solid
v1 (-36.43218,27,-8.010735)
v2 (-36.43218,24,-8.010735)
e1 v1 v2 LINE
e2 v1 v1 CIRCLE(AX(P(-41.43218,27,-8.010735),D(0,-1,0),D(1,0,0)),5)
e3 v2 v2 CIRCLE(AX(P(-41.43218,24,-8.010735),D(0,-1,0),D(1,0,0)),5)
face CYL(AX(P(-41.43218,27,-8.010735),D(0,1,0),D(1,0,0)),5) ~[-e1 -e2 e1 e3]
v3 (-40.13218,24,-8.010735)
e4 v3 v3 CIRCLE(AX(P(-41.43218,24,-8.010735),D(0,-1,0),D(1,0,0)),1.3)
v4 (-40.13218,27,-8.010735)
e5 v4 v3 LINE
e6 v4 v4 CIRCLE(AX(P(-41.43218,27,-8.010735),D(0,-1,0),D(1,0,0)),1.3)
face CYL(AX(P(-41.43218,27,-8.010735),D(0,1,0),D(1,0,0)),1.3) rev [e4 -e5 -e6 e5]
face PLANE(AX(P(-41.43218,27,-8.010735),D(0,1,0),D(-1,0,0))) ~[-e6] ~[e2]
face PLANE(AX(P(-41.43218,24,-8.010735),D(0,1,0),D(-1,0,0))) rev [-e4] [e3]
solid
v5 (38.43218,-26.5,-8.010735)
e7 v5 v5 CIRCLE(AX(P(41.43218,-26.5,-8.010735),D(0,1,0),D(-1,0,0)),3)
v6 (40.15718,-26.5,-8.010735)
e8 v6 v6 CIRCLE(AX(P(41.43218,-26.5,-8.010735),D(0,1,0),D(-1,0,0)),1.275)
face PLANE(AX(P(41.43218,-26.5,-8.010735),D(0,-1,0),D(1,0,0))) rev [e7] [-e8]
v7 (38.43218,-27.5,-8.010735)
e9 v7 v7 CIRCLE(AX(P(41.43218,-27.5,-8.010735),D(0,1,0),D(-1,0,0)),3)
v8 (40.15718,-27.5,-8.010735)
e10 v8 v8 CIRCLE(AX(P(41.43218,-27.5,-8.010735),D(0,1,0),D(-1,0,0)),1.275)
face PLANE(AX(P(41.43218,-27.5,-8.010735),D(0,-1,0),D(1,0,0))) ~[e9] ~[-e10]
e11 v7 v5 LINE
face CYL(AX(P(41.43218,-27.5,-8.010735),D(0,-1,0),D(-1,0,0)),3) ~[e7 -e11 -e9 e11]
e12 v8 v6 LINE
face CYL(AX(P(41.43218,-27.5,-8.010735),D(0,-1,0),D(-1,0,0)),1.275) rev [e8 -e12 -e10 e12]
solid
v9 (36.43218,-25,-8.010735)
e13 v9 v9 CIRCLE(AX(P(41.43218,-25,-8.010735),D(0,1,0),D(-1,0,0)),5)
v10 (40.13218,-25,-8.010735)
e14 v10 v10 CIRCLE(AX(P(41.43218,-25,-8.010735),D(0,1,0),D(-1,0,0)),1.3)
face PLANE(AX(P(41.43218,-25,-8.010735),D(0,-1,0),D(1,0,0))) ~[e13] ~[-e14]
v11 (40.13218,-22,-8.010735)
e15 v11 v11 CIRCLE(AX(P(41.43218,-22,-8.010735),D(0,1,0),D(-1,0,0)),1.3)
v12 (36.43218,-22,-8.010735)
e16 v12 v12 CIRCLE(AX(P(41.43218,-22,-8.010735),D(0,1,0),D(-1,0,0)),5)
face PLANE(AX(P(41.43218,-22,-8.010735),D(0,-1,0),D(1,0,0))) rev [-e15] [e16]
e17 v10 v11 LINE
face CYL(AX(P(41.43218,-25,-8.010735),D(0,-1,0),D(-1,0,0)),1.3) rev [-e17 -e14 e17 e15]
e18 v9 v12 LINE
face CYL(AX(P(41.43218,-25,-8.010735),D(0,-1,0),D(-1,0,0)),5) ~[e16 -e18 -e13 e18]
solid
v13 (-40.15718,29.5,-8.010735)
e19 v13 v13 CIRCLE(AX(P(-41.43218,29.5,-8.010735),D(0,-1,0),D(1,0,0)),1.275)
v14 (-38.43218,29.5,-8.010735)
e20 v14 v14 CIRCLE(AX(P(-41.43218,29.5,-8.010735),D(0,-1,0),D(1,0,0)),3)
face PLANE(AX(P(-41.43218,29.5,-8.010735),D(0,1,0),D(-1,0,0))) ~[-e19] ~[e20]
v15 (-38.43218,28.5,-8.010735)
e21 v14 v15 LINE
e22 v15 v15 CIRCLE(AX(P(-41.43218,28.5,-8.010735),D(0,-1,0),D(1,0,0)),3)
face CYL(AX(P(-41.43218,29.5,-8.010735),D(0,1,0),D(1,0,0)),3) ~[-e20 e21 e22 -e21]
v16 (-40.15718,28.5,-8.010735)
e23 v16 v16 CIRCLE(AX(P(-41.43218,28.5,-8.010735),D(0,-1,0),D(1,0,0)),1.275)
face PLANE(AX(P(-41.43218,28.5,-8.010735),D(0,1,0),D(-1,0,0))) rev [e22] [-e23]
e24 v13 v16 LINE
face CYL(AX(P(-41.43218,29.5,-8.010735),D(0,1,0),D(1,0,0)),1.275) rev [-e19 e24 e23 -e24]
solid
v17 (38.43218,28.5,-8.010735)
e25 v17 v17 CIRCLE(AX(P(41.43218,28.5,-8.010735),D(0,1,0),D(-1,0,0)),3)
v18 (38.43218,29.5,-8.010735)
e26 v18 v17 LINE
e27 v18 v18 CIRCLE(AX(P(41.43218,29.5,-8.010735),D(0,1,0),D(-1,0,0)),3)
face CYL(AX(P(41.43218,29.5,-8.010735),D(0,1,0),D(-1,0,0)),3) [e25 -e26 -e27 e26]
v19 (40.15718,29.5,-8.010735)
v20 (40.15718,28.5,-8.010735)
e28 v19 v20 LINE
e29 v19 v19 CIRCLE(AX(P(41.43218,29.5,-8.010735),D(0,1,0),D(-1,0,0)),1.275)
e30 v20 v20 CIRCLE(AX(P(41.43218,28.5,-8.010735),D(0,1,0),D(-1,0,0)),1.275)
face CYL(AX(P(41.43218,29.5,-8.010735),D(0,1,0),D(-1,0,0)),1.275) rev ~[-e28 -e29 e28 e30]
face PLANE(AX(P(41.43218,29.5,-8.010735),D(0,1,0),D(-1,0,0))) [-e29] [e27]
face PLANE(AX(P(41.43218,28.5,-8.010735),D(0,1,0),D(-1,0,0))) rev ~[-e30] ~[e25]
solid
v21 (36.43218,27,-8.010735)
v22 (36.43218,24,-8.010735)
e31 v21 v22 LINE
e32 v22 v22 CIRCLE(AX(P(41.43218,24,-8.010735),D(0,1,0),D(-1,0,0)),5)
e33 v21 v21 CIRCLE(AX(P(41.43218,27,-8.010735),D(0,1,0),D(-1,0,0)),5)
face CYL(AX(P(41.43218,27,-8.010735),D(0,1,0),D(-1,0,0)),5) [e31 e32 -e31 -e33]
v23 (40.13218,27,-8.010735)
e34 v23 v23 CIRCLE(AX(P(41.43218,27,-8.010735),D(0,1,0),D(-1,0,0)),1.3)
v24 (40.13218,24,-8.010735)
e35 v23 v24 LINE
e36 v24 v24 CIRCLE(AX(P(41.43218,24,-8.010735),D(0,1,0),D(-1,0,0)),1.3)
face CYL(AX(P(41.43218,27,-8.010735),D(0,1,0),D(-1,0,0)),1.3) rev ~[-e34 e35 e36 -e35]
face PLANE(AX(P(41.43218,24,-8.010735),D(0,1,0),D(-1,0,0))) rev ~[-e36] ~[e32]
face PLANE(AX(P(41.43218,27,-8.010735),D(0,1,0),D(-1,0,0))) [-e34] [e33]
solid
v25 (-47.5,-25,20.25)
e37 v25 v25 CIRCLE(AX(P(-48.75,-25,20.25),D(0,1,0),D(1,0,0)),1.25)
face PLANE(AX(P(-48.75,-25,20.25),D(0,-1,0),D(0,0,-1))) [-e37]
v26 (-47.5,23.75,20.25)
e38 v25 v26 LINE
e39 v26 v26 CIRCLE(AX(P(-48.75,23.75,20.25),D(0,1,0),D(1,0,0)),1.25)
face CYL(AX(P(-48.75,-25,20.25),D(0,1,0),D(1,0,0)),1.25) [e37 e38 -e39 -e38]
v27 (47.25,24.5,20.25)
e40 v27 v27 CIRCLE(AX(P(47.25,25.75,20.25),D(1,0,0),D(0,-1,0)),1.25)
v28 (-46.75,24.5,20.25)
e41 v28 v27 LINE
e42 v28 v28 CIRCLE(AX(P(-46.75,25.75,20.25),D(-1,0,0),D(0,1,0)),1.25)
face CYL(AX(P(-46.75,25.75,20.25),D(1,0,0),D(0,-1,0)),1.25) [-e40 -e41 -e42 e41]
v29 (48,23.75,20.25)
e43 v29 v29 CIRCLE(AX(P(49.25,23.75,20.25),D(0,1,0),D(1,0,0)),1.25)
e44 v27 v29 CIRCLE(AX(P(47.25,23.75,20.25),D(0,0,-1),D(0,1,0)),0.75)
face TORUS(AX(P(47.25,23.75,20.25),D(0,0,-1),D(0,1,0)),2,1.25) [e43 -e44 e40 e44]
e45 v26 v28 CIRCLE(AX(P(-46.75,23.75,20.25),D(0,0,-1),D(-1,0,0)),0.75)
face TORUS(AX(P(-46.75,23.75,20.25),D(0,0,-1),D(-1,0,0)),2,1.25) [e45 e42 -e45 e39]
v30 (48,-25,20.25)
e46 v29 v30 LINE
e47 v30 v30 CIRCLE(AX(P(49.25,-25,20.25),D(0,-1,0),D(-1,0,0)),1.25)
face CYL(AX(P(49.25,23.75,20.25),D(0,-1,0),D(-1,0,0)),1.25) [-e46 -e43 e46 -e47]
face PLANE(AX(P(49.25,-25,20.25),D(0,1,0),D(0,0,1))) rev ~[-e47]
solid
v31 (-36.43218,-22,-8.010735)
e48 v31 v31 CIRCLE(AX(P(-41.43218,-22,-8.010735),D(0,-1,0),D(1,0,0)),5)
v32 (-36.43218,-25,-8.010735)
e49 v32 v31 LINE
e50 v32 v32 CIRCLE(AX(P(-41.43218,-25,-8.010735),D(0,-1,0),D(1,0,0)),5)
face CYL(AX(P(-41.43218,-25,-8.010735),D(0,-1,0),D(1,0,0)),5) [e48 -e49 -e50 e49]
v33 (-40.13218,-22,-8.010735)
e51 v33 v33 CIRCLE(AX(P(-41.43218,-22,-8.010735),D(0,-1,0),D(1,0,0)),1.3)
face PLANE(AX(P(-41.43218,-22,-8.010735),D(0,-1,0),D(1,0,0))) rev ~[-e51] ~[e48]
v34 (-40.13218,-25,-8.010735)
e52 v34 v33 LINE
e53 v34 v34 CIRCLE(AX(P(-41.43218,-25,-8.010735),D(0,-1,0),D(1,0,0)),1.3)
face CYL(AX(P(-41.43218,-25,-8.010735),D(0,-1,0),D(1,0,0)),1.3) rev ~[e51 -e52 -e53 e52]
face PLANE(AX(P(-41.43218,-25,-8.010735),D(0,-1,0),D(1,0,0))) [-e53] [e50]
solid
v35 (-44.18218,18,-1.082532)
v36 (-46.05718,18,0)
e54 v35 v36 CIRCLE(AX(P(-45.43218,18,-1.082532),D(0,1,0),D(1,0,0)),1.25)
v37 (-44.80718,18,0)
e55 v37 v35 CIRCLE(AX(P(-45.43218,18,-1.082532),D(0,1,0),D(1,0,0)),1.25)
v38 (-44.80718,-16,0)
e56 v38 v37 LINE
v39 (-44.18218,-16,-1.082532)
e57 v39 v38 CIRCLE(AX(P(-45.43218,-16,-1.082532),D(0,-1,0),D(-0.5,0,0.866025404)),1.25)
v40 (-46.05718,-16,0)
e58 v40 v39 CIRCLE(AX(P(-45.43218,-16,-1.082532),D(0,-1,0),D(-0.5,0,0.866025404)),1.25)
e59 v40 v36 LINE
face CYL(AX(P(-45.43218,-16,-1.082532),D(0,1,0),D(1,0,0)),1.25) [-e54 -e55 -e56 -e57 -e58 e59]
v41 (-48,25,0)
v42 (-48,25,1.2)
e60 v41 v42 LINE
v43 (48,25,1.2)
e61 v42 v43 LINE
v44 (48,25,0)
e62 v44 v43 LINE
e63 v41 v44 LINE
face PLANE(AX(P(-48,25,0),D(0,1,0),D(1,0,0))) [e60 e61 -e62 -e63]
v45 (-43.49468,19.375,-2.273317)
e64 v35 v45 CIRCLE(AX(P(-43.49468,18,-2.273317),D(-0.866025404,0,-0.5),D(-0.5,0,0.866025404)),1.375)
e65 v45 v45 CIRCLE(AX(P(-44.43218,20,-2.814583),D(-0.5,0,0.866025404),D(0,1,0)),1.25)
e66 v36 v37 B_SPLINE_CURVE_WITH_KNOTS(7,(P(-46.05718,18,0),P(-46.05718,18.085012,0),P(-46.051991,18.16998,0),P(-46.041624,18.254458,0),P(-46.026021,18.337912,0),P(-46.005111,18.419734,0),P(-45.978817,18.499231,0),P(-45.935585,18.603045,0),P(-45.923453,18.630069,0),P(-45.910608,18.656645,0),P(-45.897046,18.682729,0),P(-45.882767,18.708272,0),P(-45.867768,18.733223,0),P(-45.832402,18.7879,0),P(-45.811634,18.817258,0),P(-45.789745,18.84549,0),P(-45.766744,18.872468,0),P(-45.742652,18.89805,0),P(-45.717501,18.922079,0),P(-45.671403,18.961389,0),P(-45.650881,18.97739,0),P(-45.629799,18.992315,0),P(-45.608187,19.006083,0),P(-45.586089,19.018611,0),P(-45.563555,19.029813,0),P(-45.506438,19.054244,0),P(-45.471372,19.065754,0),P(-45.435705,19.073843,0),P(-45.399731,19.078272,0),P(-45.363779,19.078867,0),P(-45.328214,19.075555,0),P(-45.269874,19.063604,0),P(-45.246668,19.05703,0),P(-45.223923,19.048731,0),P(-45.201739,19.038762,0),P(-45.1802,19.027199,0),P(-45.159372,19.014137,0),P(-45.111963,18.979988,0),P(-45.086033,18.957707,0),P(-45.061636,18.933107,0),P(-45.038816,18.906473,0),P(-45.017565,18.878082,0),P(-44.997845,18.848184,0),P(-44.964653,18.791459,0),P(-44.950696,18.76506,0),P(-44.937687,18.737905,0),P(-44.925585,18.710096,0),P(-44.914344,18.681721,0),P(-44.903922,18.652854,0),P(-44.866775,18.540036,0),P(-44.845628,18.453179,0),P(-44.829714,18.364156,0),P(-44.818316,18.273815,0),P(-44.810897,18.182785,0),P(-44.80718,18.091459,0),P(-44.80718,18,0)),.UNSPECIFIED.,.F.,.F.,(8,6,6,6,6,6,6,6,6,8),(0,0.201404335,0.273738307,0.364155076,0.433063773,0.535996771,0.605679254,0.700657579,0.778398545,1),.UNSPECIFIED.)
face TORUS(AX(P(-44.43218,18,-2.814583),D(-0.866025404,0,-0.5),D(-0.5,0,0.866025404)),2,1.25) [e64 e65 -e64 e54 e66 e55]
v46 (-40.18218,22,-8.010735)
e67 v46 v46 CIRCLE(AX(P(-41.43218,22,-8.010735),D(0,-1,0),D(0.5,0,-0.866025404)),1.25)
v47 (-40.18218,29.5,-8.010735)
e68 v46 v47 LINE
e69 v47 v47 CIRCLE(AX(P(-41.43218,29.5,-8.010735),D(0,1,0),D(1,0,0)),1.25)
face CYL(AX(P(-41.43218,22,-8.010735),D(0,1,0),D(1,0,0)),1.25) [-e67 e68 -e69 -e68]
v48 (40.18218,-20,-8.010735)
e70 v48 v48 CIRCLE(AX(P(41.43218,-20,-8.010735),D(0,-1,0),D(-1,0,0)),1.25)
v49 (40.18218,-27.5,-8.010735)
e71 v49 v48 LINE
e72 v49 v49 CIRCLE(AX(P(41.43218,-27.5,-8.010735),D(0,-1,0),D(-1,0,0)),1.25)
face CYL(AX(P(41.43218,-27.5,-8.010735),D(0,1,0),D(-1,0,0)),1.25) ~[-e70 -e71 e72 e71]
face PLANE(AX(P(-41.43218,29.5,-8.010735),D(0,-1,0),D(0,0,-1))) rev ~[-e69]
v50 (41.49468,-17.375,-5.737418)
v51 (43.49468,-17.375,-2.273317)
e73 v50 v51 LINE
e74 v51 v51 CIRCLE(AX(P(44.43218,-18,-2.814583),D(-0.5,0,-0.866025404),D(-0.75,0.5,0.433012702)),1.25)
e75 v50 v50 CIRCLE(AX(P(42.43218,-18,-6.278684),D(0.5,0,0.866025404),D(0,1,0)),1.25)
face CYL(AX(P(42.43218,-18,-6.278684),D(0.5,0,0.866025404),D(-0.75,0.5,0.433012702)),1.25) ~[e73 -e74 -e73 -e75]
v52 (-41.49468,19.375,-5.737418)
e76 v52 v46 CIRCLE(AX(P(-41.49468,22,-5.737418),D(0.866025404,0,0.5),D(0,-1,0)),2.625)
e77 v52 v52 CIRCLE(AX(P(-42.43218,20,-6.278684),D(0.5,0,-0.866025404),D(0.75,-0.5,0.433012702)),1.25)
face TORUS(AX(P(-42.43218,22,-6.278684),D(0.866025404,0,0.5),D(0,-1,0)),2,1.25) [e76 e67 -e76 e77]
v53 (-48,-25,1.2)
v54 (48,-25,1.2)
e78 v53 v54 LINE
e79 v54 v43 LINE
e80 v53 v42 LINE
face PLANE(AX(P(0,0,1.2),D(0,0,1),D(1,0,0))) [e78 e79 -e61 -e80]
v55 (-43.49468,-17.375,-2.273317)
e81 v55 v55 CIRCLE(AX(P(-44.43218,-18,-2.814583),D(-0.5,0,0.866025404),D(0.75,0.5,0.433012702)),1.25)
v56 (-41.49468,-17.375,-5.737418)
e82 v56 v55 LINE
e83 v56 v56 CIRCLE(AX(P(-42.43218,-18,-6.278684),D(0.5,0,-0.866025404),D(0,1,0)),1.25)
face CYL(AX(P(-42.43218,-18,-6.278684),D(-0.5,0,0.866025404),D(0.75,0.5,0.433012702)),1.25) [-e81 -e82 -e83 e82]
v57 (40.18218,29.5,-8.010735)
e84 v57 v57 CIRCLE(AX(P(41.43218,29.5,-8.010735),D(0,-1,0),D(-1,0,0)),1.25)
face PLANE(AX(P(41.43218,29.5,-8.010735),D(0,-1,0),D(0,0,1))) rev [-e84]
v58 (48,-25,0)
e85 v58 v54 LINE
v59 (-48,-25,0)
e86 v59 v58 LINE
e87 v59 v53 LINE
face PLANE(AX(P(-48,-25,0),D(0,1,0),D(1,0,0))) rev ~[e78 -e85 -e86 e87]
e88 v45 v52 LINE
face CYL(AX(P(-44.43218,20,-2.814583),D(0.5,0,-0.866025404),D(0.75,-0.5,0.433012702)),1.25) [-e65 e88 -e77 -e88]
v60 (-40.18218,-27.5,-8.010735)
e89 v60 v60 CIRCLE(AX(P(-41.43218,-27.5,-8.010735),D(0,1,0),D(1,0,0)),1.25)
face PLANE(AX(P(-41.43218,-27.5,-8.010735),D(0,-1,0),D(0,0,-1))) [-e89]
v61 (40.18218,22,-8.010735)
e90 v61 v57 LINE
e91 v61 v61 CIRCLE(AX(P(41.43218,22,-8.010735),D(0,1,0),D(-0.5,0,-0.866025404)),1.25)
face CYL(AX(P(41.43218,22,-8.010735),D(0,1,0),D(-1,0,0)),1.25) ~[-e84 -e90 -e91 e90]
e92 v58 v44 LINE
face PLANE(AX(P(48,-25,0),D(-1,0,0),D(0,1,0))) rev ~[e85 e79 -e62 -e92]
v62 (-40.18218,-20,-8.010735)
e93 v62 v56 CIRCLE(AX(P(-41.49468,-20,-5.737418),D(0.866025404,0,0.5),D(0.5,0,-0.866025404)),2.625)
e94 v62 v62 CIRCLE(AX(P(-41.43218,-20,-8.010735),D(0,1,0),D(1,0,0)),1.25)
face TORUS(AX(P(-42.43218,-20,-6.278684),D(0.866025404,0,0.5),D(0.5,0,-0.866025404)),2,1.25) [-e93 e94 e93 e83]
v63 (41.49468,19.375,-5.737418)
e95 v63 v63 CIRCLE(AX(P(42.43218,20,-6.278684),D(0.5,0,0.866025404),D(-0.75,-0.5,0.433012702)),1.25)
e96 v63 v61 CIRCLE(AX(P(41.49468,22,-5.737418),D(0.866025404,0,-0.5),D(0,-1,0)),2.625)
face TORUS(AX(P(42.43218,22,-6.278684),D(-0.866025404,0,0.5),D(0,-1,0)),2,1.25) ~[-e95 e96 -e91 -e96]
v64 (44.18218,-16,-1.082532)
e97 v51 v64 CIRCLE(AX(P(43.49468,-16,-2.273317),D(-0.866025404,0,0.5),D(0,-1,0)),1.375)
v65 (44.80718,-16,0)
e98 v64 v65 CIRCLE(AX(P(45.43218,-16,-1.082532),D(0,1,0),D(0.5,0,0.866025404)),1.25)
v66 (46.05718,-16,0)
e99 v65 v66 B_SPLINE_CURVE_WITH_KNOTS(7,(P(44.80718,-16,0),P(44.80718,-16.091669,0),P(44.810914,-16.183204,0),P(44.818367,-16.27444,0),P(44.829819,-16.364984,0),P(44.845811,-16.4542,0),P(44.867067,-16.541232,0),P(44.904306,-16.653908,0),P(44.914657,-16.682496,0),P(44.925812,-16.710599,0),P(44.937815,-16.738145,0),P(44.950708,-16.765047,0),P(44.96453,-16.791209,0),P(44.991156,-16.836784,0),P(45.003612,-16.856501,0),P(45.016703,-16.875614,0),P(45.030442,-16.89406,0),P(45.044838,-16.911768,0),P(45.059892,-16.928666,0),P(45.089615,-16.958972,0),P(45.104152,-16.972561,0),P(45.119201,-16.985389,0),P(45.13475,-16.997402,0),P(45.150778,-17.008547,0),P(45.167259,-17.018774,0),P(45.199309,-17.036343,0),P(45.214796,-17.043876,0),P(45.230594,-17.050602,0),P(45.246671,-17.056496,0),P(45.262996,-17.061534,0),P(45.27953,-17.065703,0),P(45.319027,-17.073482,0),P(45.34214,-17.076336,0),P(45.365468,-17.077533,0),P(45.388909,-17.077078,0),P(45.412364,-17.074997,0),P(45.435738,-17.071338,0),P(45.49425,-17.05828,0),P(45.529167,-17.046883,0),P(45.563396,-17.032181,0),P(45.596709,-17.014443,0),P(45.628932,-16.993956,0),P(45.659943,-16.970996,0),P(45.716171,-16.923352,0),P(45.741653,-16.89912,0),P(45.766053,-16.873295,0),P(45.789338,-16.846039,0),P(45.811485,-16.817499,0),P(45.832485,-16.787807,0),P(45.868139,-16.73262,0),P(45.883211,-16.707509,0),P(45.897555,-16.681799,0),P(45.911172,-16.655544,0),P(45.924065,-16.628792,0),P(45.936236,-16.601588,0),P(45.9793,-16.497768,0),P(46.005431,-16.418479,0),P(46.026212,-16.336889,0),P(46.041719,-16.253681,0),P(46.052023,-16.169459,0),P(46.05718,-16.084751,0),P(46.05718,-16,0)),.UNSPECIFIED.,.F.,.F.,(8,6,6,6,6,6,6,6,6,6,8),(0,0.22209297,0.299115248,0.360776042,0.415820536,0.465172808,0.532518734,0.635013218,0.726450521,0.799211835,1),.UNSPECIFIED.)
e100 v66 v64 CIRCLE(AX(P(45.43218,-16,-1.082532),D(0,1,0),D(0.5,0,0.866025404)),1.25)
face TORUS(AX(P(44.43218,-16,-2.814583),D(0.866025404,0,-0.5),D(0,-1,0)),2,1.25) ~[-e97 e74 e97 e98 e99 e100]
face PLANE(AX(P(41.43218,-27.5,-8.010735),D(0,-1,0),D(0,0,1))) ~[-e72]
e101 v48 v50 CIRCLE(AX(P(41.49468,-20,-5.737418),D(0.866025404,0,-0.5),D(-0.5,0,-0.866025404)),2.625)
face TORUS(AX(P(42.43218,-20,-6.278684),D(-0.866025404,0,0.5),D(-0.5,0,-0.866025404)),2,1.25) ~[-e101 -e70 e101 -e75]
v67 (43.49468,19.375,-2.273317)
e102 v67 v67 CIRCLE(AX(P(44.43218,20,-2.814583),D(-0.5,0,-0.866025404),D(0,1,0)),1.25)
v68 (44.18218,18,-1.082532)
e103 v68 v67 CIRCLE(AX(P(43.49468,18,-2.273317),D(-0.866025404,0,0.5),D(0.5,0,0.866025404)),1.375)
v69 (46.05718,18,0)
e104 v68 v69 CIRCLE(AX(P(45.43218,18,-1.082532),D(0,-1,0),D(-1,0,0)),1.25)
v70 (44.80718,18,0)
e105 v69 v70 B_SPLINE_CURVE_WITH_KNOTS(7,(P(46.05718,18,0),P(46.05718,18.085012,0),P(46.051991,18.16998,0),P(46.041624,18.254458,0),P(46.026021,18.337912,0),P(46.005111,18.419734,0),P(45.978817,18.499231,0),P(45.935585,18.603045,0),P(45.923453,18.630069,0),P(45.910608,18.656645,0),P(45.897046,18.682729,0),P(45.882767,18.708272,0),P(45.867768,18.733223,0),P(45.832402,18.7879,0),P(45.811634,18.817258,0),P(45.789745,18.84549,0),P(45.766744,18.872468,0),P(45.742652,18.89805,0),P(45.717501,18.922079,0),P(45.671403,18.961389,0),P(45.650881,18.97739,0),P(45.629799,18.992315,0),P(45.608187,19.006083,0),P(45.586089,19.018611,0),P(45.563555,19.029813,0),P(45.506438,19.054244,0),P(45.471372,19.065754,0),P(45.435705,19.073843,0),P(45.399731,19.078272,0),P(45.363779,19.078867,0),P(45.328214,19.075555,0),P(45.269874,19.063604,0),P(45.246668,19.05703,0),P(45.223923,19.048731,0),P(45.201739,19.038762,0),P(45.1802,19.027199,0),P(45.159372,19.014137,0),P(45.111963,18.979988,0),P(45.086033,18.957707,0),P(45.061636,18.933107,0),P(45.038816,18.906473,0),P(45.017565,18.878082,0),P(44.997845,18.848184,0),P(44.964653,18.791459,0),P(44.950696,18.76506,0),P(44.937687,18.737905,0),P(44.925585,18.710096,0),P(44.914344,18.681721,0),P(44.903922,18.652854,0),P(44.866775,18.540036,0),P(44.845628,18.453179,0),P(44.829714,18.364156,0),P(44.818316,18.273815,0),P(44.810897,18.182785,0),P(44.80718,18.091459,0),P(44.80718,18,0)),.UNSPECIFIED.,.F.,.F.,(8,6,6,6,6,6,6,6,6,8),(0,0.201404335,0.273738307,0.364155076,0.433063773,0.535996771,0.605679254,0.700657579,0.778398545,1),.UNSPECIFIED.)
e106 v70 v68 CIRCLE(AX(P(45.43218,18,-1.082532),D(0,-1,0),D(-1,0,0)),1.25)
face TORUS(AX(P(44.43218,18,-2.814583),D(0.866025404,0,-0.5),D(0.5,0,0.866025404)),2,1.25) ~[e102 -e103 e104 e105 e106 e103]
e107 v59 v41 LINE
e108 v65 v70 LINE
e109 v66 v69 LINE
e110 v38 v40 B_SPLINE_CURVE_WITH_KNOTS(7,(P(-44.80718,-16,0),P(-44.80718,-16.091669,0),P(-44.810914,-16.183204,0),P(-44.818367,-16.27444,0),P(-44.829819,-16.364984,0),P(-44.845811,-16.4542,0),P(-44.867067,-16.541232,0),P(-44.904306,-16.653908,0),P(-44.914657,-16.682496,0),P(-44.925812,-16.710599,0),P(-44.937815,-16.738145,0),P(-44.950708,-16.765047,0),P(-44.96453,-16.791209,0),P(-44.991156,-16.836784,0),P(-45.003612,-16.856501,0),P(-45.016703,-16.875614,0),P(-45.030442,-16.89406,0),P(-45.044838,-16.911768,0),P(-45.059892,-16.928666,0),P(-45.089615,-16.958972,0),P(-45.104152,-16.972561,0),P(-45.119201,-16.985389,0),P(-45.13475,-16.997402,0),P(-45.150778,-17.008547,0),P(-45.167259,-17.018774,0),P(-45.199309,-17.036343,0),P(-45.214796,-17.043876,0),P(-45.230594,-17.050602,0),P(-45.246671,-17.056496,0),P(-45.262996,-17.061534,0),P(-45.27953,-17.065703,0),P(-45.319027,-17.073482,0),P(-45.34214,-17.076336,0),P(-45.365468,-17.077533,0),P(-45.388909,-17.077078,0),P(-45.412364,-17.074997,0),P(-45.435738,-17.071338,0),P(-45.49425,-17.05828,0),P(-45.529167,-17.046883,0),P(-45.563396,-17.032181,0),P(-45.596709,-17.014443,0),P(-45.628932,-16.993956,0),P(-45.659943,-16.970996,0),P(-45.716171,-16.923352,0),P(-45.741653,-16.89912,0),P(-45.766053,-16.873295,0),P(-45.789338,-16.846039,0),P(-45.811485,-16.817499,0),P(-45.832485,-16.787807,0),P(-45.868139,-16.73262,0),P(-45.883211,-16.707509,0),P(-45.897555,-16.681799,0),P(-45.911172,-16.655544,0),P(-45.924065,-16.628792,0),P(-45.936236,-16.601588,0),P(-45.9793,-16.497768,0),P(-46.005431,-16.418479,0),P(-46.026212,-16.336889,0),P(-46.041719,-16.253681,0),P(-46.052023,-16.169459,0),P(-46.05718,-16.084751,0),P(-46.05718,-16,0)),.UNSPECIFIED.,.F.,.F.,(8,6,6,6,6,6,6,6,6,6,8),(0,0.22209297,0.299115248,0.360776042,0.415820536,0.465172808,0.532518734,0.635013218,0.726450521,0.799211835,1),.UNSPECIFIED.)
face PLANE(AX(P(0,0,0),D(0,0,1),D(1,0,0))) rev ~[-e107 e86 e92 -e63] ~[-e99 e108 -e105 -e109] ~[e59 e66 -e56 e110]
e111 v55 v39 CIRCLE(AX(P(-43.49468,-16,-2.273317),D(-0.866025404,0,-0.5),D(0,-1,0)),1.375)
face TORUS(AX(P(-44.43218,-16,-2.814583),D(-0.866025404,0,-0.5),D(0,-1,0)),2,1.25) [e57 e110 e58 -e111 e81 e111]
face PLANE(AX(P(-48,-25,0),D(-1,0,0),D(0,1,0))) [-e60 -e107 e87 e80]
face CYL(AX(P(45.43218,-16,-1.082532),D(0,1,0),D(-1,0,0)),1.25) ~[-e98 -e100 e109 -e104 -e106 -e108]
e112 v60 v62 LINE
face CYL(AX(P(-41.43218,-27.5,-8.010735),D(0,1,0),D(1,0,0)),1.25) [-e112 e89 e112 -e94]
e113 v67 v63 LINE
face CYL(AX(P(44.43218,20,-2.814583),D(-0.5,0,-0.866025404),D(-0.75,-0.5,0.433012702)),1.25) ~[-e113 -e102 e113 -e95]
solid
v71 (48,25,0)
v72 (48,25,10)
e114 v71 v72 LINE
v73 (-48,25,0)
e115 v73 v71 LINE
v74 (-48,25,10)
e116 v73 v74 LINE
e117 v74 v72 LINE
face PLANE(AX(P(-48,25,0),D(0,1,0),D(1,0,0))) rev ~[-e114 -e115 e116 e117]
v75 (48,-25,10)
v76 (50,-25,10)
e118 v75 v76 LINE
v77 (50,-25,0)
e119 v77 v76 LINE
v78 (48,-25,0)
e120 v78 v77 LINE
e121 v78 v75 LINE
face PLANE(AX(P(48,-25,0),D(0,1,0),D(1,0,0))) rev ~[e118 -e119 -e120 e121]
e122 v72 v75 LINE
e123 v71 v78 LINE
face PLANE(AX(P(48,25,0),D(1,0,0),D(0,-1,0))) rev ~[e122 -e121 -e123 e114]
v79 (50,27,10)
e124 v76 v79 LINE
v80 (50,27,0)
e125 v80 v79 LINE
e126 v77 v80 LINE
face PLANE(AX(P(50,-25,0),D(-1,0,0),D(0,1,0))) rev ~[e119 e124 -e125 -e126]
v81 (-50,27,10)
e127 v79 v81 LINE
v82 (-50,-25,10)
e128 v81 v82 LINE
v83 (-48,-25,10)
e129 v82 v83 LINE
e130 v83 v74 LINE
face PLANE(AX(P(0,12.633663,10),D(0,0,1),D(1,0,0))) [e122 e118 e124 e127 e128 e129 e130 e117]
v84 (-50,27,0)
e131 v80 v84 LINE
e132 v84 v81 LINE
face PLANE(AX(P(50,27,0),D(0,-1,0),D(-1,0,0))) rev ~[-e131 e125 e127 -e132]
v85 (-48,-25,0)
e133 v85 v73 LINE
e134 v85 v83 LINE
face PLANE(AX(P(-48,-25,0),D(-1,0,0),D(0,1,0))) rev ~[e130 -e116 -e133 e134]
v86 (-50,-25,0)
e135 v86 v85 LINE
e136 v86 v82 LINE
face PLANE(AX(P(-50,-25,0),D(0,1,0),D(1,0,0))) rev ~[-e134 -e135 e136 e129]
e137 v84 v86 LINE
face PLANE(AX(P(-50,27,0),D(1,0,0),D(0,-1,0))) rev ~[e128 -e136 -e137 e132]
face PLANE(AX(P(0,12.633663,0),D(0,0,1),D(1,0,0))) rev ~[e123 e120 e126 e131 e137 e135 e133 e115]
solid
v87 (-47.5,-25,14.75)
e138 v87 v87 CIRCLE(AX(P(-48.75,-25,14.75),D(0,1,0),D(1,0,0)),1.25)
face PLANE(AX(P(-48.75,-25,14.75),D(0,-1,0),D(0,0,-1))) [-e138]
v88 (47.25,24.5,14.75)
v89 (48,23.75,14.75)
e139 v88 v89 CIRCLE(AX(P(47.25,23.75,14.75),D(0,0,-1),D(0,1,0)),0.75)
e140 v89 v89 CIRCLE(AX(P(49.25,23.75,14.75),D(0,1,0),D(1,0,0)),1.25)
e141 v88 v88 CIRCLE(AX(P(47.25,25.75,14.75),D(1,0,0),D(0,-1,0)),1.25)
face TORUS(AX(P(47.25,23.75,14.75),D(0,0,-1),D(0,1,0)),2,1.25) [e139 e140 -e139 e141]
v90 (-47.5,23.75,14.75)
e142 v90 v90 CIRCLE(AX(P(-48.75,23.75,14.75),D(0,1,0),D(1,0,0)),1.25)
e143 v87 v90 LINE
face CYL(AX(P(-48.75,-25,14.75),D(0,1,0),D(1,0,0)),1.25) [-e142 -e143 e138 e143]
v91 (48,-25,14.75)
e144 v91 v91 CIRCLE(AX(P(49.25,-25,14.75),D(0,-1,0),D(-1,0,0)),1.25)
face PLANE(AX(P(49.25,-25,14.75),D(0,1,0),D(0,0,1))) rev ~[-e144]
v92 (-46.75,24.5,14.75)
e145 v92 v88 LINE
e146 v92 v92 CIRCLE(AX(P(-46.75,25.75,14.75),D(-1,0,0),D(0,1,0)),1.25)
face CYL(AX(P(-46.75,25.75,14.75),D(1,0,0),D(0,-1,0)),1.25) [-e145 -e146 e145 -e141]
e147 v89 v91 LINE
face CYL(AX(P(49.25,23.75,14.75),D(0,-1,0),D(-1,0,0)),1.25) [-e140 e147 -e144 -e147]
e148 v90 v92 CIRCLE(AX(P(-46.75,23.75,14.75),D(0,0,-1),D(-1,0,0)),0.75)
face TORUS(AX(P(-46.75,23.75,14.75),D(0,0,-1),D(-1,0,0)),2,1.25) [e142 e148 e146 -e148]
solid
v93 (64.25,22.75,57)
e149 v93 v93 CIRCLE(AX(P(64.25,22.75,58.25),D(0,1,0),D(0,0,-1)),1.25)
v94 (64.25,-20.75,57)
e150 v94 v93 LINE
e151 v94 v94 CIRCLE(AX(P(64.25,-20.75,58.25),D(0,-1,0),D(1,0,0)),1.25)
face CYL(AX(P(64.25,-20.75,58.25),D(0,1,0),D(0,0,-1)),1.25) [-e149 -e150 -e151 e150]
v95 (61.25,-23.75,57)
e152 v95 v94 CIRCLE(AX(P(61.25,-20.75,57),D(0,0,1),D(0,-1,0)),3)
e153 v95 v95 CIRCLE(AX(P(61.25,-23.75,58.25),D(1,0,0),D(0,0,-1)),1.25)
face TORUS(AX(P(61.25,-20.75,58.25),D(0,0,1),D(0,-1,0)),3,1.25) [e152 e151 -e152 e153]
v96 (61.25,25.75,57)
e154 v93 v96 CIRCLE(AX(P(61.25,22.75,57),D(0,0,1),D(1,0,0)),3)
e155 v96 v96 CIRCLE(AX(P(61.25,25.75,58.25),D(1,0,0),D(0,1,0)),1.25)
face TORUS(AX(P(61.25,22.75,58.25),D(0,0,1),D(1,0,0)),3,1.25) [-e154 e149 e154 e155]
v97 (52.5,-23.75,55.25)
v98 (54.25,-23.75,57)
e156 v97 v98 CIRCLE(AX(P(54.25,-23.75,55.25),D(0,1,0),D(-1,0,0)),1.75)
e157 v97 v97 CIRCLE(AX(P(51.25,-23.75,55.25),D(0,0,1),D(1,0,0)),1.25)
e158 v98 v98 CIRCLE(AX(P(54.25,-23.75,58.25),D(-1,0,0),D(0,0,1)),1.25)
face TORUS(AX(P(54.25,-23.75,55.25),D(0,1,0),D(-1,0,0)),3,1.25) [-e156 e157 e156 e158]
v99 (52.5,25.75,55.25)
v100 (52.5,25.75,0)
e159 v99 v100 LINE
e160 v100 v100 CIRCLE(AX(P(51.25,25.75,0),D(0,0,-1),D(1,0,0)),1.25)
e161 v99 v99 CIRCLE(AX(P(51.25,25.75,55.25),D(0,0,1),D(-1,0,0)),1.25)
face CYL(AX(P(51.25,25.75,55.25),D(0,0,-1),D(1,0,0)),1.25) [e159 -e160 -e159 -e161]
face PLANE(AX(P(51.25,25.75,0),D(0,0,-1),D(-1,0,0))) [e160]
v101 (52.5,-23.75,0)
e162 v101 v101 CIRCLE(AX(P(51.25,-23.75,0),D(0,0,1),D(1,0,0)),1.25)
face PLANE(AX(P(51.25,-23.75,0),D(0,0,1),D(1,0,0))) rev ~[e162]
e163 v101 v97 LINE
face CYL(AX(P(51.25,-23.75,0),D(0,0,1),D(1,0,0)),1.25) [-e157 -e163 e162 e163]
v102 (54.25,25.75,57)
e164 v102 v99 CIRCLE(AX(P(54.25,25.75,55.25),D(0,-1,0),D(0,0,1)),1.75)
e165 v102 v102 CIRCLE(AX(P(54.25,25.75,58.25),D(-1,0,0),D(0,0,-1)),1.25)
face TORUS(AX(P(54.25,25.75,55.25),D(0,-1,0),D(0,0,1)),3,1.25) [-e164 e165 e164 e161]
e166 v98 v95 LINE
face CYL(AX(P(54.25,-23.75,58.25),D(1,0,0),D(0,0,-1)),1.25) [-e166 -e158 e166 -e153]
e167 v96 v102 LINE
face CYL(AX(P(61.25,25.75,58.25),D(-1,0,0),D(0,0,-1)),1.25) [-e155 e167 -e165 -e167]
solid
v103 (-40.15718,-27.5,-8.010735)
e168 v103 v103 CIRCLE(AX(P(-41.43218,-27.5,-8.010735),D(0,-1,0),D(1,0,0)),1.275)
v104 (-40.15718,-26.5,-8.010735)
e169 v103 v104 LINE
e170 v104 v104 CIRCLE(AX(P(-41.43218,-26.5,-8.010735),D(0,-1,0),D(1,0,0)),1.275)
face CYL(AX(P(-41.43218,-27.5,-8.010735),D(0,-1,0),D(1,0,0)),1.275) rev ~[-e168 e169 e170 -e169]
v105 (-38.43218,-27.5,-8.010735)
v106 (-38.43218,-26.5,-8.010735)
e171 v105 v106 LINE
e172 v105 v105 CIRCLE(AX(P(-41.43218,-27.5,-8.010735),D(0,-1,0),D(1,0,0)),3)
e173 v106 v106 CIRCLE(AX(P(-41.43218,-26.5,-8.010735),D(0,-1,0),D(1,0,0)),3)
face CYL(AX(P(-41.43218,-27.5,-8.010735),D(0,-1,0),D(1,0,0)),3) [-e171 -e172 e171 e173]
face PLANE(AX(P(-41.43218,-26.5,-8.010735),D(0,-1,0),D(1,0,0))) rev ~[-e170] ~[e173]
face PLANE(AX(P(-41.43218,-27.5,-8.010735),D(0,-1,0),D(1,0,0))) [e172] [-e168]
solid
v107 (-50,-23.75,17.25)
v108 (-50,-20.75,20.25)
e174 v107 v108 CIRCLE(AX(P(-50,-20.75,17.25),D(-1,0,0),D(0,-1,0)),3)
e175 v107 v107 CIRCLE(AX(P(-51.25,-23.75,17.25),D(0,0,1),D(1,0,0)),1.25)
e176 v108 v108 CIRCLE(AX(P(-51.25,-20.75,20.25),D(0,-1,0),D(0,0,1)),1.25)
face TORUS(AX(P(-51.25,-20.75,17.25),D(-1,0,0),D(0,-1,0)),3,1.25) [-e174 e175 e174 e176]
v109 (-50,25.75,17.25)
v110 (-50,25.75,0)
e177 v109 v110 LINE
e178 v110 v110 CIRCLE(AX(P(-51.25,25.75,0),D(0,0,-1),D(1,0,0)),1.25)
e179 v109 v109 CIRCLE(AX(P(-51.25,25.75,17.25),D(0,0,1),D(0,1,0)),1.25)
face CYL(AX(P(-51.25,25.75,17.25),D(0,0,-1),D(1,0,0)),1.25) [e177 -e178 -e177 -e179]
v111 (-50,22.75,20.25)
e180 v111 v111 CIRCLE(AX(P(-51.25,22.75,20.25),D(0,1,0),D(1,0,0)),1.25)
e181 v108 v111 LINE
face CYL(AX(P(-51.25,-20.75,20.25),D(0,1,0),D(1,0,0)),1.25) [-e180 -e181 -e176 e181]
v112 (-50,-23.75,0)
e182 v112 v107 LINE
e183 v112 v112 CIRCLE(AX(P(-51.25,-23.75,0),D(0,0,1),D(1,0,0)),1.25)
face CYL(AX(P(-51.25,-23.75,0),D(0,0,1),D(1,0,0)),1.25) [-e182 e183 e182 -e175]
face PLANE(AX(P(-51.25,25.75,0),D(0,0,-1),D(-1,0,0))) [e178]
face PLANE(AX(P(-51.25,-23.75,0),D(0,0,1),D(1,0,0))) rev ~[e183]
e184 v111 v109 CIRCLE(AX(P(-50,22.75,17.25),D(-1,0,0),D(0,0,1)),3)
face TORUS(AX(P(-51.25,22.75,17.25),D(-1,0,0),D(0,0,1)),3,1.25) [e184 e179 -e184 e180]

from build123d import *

# Parameters (mm, degrees)
F0_W      = 96
F0_H      = 50
F1_DEPTH  = 1.2
F3_DEPTH  = 10
F5_R      = 1.25
F9_R      = 1.25
F13_R     = 1.25
F4_R      = 1.25
F29_R     = 1.25
F32_R     = 3
F32_R_2   = 1.275
F33_DEPTH = 1
F34_R     = 5
F34_R_2   = 1.3
F35_DEPTH = 3


with BuildPart() as f1:
    # F0 (on Top) → F1 (new body)
    with BuildSketch(Plane.XY):
        Rectangle(F0_W, F0_H)
    extrude(amount=F1_DEPTH)

    # F30: sweep along a path in F27
    with BuildLine(Plane(origin=(-34.5428847577, 0, -19.9433438135), x_dir=(0, 1, 0), z_dir=(0.8660254038, 0, 0.5))) as f30_path:
        Line((-27.5, 13.7785898385), (-20, 13.7785898385))
        ThreePointArc((-20, 13.7785898385), (-18.5857864376, 14.3643762761), (-18, 15.7785898385))
        Line((-18, 15.7785898385), (-18, 19.7785898385))
        ThreePointArc((-18, 19.7785898385), (-17.4142135624, 21.1928034009), (-16, 21.7785898385))
        Line((-16, 21.7785898385), (18, 21.7785898385))
        ThreePointArc((18, 21.7785898385), (19.4142135624, 21.1928034009), (20, 19.7785898385))
        Line((20, 19.7785898385), (20, 15.7785898385))
        ThreePointArc((20, 15.7785898385), (20.5857864376, 14.3643762761), (22, 13.7785898385))
        Line((22, 13.7785898385), (29.5, 13.7785898385))
    # F29 (on line) → F30 (sweep)
    with BuildSketch(Plane.XZ.offset(27.5)):
        with Locations((-41.432179677, -8.010734985)):
            Circle(F29_R)
    sweep(path=f30_path.line)

    # F31: F1 across plane


with BuildPart() as f3:
    # F2 (on Top) → F3 (new body)
    with BuildSketch(Plane.XY):
        Polygon((-48, -25), (-48, 25), (48, 25), (48, -25), (50, -25), (50, 27), (-50, 27), (-50, -25), align=None)
    extrude(amount=F3_DEPTH)


with BuildPart() as f8:
    # F8: sweep along a path in F7
    with BuildLine(Plane.YZ.offset(-51.25)) as f8_path:
        Line((-23.75, 0), (-23.75, 17.25))
        ThreePointArc((-23.75, 17.25), (-22.8713203436, 19.3713203436), (-20.75, 20.25))
        Line((-20.75, 20.25), (22.75, 20.25))
        ThreePointArc((22.75, 20.25), (24.8713203436, 19.3713203436), (25.75, 17.25))
        Line((25.75, 17.25), (25.75, 0))
    # F5 (on Top) → F8 (sweep)
    with BuildSketch(Plane.XY):
        with Locations((-51.25, -23.75)):
            Circle(F5_R)
    sweep(path=f8_path.line)


with BuildPart() as f12:
    # F12: sweep along a path in F11
    with BuildLine(Plane.XY.offset(20.25)) as f12_path:
        Line((-48.75, -25), (-48.75, 23.75))
        ThreePointArc((-48.75, 23.75), (-48.1642135624, 25.1642135624), (-46.75, 25.75))
        Line((-46.75, 25.75), (47.25, 25.75))
        ThreePointArc((47.25, 25.75), (48.6642135624, 25.1642135624), (49.25, 23.75))
        Line((49.25, 23.75), (49.25, -25))
    # F9 (on face) → F12 (sweep)
    with BuildSketch(Plane.XZ.offset(25)):
        with Locations((-48.75, 20.25)):
            Circle(F9_R)
    sweep(path=f12_path.line)


with BuildPart() as f16:
    # F16: sweep along a path in F15
    with BuildLine(Plane.XY.offset(14.75)) as f16_path:
        Line((-48.75, -25), (-48.75, 23.75))
        ThreePointArc((-48.75, 23.75), (-48.1642135624, 25.1642135624), (-46.75, 25.75))
        Line((-46.75, 25.75), (47.25, 25.75))
        ThreePointArc((47.25, 25.75), (48.6642135624, 25.1642135624), (49.25, 23.75))
        Line((49.25, 23.75), (49.25, -25))
    # F13 (on face) → F16 (sweep)
    with BuildSketch(Plane.XZ.offset(25)):
        with Locations((-48.75, 14.75)):
            Circle(F13_R)
    sweep(path=f16_path.line)


with BuildPart() as f23:
    # F23: sweep along a path in F18, F22, F20
    with BuildLine(Plane.XZ.offset(23.75)) as f23_path:
        Line((51.25, 0), (51.25, 55.25))
        ThreePointArc((51.25, 55.25), (52.1286796564, 57.3713203436), (54.25, 58.25))
    with BuildLine(Plane.XY.offset(58.25)) as f23_path_2:
        Line((54.25, -23.75), (61.25, -23.75))
        ThreePointArc((61.25, -23.75), (63.3713203436, -22.8713203436), (64.25, -20.75))
        Line((64.25, -20.75), (64.25, 22.75))
        ThreePointArc((64.25, 22.75), (63.3713203436, 24.8713203436), (61.25, 25.75))
        Line((61.25, 25.75), (54.25, 25.75))
    with BuildLine(Plane(origin=(0, 25.75, 0), x_dir=(-1, 0, 0), z_dir=(0, 1, 0))) as f23_path_3:
        ThreePointArc((-54.25, 58.25), (-52.1286796564, 57.3713203436), (-51.25, 55.25))
        Line((-51.25, 55.25), (-51.25, 0))
    # F4 (on Top) → F23 (sweep)
    with BuildSketch(Plane.XY):
        with Locations((51.25, -23.75)):
            Circle(F4_R)
    sweep(path=f23_path.line + f23_path_2.line + f23_path_3.line)


with BuildPart() as f1_1:
    add(f1.part)
    add(f1.part.mirror(Plane.YZ))


with BuildPart() as f33:
    # F32 (on face) → F33 (new body)
    with BuildSketch(Plane.XZ.offset(27.5)):
        with Locations((-41.432179677, -8.010734985)):
            Circle(F32_R)
        with Locations((-41.432179677, -8.010734985)):
            Circle(F32_R_2, mode=Mode.SUBTRACT)
    extrude(amount=-F33_DEPTH)


with BuildPart() as f35:
    # F34 (on face) → F35 (new body)
    with BuildSketch(Plane.XZ.offset(25)):
        with Locations((-41.432179677, -8.010734985)):
            Circle(F34_R)
        with Locations((-41.432179677, -8.010734985)):
            Circle(F34_R_2, mode=Mode.SUBTRACT)
    extrude(amount=-F35_DEPTH)


with BuildPart() as f37_1:
    # F37: instance of F35
    add(f35.part.mirror(Plane.XZ.offset(-1)))


with BuildPart() as f37_2:
    # F37: instance of F33
    add(f33.part.mirror(Plane.XZ.offset(-1)))


with BuildPart() as f38_1:
    # F38: instance of F33
    add(f33.part.mirror(Plane.YZ))


with BuildPart() as f38_2:
    # F38: instance of F35
    add(f35.part.mirror(Plane.YZ))


with BuildPart() as f38_3:
    # F38: instance of F37_2
    add(f37_2.part.mirror(Plane.YZ))


with BuildPart() as f38_4:
    # F38: instance of F37_1
    add(f37_1.part.mirror(Plane.YZ))


solid = Compound([f3.part, f8.part, f12.part, f16.part, f23.part, f1_1.part, f33.part, f35.part, f37_1.part, f37_2.part, f38_1.part, f38_2.part, f38_3.part, f38_4.part])
